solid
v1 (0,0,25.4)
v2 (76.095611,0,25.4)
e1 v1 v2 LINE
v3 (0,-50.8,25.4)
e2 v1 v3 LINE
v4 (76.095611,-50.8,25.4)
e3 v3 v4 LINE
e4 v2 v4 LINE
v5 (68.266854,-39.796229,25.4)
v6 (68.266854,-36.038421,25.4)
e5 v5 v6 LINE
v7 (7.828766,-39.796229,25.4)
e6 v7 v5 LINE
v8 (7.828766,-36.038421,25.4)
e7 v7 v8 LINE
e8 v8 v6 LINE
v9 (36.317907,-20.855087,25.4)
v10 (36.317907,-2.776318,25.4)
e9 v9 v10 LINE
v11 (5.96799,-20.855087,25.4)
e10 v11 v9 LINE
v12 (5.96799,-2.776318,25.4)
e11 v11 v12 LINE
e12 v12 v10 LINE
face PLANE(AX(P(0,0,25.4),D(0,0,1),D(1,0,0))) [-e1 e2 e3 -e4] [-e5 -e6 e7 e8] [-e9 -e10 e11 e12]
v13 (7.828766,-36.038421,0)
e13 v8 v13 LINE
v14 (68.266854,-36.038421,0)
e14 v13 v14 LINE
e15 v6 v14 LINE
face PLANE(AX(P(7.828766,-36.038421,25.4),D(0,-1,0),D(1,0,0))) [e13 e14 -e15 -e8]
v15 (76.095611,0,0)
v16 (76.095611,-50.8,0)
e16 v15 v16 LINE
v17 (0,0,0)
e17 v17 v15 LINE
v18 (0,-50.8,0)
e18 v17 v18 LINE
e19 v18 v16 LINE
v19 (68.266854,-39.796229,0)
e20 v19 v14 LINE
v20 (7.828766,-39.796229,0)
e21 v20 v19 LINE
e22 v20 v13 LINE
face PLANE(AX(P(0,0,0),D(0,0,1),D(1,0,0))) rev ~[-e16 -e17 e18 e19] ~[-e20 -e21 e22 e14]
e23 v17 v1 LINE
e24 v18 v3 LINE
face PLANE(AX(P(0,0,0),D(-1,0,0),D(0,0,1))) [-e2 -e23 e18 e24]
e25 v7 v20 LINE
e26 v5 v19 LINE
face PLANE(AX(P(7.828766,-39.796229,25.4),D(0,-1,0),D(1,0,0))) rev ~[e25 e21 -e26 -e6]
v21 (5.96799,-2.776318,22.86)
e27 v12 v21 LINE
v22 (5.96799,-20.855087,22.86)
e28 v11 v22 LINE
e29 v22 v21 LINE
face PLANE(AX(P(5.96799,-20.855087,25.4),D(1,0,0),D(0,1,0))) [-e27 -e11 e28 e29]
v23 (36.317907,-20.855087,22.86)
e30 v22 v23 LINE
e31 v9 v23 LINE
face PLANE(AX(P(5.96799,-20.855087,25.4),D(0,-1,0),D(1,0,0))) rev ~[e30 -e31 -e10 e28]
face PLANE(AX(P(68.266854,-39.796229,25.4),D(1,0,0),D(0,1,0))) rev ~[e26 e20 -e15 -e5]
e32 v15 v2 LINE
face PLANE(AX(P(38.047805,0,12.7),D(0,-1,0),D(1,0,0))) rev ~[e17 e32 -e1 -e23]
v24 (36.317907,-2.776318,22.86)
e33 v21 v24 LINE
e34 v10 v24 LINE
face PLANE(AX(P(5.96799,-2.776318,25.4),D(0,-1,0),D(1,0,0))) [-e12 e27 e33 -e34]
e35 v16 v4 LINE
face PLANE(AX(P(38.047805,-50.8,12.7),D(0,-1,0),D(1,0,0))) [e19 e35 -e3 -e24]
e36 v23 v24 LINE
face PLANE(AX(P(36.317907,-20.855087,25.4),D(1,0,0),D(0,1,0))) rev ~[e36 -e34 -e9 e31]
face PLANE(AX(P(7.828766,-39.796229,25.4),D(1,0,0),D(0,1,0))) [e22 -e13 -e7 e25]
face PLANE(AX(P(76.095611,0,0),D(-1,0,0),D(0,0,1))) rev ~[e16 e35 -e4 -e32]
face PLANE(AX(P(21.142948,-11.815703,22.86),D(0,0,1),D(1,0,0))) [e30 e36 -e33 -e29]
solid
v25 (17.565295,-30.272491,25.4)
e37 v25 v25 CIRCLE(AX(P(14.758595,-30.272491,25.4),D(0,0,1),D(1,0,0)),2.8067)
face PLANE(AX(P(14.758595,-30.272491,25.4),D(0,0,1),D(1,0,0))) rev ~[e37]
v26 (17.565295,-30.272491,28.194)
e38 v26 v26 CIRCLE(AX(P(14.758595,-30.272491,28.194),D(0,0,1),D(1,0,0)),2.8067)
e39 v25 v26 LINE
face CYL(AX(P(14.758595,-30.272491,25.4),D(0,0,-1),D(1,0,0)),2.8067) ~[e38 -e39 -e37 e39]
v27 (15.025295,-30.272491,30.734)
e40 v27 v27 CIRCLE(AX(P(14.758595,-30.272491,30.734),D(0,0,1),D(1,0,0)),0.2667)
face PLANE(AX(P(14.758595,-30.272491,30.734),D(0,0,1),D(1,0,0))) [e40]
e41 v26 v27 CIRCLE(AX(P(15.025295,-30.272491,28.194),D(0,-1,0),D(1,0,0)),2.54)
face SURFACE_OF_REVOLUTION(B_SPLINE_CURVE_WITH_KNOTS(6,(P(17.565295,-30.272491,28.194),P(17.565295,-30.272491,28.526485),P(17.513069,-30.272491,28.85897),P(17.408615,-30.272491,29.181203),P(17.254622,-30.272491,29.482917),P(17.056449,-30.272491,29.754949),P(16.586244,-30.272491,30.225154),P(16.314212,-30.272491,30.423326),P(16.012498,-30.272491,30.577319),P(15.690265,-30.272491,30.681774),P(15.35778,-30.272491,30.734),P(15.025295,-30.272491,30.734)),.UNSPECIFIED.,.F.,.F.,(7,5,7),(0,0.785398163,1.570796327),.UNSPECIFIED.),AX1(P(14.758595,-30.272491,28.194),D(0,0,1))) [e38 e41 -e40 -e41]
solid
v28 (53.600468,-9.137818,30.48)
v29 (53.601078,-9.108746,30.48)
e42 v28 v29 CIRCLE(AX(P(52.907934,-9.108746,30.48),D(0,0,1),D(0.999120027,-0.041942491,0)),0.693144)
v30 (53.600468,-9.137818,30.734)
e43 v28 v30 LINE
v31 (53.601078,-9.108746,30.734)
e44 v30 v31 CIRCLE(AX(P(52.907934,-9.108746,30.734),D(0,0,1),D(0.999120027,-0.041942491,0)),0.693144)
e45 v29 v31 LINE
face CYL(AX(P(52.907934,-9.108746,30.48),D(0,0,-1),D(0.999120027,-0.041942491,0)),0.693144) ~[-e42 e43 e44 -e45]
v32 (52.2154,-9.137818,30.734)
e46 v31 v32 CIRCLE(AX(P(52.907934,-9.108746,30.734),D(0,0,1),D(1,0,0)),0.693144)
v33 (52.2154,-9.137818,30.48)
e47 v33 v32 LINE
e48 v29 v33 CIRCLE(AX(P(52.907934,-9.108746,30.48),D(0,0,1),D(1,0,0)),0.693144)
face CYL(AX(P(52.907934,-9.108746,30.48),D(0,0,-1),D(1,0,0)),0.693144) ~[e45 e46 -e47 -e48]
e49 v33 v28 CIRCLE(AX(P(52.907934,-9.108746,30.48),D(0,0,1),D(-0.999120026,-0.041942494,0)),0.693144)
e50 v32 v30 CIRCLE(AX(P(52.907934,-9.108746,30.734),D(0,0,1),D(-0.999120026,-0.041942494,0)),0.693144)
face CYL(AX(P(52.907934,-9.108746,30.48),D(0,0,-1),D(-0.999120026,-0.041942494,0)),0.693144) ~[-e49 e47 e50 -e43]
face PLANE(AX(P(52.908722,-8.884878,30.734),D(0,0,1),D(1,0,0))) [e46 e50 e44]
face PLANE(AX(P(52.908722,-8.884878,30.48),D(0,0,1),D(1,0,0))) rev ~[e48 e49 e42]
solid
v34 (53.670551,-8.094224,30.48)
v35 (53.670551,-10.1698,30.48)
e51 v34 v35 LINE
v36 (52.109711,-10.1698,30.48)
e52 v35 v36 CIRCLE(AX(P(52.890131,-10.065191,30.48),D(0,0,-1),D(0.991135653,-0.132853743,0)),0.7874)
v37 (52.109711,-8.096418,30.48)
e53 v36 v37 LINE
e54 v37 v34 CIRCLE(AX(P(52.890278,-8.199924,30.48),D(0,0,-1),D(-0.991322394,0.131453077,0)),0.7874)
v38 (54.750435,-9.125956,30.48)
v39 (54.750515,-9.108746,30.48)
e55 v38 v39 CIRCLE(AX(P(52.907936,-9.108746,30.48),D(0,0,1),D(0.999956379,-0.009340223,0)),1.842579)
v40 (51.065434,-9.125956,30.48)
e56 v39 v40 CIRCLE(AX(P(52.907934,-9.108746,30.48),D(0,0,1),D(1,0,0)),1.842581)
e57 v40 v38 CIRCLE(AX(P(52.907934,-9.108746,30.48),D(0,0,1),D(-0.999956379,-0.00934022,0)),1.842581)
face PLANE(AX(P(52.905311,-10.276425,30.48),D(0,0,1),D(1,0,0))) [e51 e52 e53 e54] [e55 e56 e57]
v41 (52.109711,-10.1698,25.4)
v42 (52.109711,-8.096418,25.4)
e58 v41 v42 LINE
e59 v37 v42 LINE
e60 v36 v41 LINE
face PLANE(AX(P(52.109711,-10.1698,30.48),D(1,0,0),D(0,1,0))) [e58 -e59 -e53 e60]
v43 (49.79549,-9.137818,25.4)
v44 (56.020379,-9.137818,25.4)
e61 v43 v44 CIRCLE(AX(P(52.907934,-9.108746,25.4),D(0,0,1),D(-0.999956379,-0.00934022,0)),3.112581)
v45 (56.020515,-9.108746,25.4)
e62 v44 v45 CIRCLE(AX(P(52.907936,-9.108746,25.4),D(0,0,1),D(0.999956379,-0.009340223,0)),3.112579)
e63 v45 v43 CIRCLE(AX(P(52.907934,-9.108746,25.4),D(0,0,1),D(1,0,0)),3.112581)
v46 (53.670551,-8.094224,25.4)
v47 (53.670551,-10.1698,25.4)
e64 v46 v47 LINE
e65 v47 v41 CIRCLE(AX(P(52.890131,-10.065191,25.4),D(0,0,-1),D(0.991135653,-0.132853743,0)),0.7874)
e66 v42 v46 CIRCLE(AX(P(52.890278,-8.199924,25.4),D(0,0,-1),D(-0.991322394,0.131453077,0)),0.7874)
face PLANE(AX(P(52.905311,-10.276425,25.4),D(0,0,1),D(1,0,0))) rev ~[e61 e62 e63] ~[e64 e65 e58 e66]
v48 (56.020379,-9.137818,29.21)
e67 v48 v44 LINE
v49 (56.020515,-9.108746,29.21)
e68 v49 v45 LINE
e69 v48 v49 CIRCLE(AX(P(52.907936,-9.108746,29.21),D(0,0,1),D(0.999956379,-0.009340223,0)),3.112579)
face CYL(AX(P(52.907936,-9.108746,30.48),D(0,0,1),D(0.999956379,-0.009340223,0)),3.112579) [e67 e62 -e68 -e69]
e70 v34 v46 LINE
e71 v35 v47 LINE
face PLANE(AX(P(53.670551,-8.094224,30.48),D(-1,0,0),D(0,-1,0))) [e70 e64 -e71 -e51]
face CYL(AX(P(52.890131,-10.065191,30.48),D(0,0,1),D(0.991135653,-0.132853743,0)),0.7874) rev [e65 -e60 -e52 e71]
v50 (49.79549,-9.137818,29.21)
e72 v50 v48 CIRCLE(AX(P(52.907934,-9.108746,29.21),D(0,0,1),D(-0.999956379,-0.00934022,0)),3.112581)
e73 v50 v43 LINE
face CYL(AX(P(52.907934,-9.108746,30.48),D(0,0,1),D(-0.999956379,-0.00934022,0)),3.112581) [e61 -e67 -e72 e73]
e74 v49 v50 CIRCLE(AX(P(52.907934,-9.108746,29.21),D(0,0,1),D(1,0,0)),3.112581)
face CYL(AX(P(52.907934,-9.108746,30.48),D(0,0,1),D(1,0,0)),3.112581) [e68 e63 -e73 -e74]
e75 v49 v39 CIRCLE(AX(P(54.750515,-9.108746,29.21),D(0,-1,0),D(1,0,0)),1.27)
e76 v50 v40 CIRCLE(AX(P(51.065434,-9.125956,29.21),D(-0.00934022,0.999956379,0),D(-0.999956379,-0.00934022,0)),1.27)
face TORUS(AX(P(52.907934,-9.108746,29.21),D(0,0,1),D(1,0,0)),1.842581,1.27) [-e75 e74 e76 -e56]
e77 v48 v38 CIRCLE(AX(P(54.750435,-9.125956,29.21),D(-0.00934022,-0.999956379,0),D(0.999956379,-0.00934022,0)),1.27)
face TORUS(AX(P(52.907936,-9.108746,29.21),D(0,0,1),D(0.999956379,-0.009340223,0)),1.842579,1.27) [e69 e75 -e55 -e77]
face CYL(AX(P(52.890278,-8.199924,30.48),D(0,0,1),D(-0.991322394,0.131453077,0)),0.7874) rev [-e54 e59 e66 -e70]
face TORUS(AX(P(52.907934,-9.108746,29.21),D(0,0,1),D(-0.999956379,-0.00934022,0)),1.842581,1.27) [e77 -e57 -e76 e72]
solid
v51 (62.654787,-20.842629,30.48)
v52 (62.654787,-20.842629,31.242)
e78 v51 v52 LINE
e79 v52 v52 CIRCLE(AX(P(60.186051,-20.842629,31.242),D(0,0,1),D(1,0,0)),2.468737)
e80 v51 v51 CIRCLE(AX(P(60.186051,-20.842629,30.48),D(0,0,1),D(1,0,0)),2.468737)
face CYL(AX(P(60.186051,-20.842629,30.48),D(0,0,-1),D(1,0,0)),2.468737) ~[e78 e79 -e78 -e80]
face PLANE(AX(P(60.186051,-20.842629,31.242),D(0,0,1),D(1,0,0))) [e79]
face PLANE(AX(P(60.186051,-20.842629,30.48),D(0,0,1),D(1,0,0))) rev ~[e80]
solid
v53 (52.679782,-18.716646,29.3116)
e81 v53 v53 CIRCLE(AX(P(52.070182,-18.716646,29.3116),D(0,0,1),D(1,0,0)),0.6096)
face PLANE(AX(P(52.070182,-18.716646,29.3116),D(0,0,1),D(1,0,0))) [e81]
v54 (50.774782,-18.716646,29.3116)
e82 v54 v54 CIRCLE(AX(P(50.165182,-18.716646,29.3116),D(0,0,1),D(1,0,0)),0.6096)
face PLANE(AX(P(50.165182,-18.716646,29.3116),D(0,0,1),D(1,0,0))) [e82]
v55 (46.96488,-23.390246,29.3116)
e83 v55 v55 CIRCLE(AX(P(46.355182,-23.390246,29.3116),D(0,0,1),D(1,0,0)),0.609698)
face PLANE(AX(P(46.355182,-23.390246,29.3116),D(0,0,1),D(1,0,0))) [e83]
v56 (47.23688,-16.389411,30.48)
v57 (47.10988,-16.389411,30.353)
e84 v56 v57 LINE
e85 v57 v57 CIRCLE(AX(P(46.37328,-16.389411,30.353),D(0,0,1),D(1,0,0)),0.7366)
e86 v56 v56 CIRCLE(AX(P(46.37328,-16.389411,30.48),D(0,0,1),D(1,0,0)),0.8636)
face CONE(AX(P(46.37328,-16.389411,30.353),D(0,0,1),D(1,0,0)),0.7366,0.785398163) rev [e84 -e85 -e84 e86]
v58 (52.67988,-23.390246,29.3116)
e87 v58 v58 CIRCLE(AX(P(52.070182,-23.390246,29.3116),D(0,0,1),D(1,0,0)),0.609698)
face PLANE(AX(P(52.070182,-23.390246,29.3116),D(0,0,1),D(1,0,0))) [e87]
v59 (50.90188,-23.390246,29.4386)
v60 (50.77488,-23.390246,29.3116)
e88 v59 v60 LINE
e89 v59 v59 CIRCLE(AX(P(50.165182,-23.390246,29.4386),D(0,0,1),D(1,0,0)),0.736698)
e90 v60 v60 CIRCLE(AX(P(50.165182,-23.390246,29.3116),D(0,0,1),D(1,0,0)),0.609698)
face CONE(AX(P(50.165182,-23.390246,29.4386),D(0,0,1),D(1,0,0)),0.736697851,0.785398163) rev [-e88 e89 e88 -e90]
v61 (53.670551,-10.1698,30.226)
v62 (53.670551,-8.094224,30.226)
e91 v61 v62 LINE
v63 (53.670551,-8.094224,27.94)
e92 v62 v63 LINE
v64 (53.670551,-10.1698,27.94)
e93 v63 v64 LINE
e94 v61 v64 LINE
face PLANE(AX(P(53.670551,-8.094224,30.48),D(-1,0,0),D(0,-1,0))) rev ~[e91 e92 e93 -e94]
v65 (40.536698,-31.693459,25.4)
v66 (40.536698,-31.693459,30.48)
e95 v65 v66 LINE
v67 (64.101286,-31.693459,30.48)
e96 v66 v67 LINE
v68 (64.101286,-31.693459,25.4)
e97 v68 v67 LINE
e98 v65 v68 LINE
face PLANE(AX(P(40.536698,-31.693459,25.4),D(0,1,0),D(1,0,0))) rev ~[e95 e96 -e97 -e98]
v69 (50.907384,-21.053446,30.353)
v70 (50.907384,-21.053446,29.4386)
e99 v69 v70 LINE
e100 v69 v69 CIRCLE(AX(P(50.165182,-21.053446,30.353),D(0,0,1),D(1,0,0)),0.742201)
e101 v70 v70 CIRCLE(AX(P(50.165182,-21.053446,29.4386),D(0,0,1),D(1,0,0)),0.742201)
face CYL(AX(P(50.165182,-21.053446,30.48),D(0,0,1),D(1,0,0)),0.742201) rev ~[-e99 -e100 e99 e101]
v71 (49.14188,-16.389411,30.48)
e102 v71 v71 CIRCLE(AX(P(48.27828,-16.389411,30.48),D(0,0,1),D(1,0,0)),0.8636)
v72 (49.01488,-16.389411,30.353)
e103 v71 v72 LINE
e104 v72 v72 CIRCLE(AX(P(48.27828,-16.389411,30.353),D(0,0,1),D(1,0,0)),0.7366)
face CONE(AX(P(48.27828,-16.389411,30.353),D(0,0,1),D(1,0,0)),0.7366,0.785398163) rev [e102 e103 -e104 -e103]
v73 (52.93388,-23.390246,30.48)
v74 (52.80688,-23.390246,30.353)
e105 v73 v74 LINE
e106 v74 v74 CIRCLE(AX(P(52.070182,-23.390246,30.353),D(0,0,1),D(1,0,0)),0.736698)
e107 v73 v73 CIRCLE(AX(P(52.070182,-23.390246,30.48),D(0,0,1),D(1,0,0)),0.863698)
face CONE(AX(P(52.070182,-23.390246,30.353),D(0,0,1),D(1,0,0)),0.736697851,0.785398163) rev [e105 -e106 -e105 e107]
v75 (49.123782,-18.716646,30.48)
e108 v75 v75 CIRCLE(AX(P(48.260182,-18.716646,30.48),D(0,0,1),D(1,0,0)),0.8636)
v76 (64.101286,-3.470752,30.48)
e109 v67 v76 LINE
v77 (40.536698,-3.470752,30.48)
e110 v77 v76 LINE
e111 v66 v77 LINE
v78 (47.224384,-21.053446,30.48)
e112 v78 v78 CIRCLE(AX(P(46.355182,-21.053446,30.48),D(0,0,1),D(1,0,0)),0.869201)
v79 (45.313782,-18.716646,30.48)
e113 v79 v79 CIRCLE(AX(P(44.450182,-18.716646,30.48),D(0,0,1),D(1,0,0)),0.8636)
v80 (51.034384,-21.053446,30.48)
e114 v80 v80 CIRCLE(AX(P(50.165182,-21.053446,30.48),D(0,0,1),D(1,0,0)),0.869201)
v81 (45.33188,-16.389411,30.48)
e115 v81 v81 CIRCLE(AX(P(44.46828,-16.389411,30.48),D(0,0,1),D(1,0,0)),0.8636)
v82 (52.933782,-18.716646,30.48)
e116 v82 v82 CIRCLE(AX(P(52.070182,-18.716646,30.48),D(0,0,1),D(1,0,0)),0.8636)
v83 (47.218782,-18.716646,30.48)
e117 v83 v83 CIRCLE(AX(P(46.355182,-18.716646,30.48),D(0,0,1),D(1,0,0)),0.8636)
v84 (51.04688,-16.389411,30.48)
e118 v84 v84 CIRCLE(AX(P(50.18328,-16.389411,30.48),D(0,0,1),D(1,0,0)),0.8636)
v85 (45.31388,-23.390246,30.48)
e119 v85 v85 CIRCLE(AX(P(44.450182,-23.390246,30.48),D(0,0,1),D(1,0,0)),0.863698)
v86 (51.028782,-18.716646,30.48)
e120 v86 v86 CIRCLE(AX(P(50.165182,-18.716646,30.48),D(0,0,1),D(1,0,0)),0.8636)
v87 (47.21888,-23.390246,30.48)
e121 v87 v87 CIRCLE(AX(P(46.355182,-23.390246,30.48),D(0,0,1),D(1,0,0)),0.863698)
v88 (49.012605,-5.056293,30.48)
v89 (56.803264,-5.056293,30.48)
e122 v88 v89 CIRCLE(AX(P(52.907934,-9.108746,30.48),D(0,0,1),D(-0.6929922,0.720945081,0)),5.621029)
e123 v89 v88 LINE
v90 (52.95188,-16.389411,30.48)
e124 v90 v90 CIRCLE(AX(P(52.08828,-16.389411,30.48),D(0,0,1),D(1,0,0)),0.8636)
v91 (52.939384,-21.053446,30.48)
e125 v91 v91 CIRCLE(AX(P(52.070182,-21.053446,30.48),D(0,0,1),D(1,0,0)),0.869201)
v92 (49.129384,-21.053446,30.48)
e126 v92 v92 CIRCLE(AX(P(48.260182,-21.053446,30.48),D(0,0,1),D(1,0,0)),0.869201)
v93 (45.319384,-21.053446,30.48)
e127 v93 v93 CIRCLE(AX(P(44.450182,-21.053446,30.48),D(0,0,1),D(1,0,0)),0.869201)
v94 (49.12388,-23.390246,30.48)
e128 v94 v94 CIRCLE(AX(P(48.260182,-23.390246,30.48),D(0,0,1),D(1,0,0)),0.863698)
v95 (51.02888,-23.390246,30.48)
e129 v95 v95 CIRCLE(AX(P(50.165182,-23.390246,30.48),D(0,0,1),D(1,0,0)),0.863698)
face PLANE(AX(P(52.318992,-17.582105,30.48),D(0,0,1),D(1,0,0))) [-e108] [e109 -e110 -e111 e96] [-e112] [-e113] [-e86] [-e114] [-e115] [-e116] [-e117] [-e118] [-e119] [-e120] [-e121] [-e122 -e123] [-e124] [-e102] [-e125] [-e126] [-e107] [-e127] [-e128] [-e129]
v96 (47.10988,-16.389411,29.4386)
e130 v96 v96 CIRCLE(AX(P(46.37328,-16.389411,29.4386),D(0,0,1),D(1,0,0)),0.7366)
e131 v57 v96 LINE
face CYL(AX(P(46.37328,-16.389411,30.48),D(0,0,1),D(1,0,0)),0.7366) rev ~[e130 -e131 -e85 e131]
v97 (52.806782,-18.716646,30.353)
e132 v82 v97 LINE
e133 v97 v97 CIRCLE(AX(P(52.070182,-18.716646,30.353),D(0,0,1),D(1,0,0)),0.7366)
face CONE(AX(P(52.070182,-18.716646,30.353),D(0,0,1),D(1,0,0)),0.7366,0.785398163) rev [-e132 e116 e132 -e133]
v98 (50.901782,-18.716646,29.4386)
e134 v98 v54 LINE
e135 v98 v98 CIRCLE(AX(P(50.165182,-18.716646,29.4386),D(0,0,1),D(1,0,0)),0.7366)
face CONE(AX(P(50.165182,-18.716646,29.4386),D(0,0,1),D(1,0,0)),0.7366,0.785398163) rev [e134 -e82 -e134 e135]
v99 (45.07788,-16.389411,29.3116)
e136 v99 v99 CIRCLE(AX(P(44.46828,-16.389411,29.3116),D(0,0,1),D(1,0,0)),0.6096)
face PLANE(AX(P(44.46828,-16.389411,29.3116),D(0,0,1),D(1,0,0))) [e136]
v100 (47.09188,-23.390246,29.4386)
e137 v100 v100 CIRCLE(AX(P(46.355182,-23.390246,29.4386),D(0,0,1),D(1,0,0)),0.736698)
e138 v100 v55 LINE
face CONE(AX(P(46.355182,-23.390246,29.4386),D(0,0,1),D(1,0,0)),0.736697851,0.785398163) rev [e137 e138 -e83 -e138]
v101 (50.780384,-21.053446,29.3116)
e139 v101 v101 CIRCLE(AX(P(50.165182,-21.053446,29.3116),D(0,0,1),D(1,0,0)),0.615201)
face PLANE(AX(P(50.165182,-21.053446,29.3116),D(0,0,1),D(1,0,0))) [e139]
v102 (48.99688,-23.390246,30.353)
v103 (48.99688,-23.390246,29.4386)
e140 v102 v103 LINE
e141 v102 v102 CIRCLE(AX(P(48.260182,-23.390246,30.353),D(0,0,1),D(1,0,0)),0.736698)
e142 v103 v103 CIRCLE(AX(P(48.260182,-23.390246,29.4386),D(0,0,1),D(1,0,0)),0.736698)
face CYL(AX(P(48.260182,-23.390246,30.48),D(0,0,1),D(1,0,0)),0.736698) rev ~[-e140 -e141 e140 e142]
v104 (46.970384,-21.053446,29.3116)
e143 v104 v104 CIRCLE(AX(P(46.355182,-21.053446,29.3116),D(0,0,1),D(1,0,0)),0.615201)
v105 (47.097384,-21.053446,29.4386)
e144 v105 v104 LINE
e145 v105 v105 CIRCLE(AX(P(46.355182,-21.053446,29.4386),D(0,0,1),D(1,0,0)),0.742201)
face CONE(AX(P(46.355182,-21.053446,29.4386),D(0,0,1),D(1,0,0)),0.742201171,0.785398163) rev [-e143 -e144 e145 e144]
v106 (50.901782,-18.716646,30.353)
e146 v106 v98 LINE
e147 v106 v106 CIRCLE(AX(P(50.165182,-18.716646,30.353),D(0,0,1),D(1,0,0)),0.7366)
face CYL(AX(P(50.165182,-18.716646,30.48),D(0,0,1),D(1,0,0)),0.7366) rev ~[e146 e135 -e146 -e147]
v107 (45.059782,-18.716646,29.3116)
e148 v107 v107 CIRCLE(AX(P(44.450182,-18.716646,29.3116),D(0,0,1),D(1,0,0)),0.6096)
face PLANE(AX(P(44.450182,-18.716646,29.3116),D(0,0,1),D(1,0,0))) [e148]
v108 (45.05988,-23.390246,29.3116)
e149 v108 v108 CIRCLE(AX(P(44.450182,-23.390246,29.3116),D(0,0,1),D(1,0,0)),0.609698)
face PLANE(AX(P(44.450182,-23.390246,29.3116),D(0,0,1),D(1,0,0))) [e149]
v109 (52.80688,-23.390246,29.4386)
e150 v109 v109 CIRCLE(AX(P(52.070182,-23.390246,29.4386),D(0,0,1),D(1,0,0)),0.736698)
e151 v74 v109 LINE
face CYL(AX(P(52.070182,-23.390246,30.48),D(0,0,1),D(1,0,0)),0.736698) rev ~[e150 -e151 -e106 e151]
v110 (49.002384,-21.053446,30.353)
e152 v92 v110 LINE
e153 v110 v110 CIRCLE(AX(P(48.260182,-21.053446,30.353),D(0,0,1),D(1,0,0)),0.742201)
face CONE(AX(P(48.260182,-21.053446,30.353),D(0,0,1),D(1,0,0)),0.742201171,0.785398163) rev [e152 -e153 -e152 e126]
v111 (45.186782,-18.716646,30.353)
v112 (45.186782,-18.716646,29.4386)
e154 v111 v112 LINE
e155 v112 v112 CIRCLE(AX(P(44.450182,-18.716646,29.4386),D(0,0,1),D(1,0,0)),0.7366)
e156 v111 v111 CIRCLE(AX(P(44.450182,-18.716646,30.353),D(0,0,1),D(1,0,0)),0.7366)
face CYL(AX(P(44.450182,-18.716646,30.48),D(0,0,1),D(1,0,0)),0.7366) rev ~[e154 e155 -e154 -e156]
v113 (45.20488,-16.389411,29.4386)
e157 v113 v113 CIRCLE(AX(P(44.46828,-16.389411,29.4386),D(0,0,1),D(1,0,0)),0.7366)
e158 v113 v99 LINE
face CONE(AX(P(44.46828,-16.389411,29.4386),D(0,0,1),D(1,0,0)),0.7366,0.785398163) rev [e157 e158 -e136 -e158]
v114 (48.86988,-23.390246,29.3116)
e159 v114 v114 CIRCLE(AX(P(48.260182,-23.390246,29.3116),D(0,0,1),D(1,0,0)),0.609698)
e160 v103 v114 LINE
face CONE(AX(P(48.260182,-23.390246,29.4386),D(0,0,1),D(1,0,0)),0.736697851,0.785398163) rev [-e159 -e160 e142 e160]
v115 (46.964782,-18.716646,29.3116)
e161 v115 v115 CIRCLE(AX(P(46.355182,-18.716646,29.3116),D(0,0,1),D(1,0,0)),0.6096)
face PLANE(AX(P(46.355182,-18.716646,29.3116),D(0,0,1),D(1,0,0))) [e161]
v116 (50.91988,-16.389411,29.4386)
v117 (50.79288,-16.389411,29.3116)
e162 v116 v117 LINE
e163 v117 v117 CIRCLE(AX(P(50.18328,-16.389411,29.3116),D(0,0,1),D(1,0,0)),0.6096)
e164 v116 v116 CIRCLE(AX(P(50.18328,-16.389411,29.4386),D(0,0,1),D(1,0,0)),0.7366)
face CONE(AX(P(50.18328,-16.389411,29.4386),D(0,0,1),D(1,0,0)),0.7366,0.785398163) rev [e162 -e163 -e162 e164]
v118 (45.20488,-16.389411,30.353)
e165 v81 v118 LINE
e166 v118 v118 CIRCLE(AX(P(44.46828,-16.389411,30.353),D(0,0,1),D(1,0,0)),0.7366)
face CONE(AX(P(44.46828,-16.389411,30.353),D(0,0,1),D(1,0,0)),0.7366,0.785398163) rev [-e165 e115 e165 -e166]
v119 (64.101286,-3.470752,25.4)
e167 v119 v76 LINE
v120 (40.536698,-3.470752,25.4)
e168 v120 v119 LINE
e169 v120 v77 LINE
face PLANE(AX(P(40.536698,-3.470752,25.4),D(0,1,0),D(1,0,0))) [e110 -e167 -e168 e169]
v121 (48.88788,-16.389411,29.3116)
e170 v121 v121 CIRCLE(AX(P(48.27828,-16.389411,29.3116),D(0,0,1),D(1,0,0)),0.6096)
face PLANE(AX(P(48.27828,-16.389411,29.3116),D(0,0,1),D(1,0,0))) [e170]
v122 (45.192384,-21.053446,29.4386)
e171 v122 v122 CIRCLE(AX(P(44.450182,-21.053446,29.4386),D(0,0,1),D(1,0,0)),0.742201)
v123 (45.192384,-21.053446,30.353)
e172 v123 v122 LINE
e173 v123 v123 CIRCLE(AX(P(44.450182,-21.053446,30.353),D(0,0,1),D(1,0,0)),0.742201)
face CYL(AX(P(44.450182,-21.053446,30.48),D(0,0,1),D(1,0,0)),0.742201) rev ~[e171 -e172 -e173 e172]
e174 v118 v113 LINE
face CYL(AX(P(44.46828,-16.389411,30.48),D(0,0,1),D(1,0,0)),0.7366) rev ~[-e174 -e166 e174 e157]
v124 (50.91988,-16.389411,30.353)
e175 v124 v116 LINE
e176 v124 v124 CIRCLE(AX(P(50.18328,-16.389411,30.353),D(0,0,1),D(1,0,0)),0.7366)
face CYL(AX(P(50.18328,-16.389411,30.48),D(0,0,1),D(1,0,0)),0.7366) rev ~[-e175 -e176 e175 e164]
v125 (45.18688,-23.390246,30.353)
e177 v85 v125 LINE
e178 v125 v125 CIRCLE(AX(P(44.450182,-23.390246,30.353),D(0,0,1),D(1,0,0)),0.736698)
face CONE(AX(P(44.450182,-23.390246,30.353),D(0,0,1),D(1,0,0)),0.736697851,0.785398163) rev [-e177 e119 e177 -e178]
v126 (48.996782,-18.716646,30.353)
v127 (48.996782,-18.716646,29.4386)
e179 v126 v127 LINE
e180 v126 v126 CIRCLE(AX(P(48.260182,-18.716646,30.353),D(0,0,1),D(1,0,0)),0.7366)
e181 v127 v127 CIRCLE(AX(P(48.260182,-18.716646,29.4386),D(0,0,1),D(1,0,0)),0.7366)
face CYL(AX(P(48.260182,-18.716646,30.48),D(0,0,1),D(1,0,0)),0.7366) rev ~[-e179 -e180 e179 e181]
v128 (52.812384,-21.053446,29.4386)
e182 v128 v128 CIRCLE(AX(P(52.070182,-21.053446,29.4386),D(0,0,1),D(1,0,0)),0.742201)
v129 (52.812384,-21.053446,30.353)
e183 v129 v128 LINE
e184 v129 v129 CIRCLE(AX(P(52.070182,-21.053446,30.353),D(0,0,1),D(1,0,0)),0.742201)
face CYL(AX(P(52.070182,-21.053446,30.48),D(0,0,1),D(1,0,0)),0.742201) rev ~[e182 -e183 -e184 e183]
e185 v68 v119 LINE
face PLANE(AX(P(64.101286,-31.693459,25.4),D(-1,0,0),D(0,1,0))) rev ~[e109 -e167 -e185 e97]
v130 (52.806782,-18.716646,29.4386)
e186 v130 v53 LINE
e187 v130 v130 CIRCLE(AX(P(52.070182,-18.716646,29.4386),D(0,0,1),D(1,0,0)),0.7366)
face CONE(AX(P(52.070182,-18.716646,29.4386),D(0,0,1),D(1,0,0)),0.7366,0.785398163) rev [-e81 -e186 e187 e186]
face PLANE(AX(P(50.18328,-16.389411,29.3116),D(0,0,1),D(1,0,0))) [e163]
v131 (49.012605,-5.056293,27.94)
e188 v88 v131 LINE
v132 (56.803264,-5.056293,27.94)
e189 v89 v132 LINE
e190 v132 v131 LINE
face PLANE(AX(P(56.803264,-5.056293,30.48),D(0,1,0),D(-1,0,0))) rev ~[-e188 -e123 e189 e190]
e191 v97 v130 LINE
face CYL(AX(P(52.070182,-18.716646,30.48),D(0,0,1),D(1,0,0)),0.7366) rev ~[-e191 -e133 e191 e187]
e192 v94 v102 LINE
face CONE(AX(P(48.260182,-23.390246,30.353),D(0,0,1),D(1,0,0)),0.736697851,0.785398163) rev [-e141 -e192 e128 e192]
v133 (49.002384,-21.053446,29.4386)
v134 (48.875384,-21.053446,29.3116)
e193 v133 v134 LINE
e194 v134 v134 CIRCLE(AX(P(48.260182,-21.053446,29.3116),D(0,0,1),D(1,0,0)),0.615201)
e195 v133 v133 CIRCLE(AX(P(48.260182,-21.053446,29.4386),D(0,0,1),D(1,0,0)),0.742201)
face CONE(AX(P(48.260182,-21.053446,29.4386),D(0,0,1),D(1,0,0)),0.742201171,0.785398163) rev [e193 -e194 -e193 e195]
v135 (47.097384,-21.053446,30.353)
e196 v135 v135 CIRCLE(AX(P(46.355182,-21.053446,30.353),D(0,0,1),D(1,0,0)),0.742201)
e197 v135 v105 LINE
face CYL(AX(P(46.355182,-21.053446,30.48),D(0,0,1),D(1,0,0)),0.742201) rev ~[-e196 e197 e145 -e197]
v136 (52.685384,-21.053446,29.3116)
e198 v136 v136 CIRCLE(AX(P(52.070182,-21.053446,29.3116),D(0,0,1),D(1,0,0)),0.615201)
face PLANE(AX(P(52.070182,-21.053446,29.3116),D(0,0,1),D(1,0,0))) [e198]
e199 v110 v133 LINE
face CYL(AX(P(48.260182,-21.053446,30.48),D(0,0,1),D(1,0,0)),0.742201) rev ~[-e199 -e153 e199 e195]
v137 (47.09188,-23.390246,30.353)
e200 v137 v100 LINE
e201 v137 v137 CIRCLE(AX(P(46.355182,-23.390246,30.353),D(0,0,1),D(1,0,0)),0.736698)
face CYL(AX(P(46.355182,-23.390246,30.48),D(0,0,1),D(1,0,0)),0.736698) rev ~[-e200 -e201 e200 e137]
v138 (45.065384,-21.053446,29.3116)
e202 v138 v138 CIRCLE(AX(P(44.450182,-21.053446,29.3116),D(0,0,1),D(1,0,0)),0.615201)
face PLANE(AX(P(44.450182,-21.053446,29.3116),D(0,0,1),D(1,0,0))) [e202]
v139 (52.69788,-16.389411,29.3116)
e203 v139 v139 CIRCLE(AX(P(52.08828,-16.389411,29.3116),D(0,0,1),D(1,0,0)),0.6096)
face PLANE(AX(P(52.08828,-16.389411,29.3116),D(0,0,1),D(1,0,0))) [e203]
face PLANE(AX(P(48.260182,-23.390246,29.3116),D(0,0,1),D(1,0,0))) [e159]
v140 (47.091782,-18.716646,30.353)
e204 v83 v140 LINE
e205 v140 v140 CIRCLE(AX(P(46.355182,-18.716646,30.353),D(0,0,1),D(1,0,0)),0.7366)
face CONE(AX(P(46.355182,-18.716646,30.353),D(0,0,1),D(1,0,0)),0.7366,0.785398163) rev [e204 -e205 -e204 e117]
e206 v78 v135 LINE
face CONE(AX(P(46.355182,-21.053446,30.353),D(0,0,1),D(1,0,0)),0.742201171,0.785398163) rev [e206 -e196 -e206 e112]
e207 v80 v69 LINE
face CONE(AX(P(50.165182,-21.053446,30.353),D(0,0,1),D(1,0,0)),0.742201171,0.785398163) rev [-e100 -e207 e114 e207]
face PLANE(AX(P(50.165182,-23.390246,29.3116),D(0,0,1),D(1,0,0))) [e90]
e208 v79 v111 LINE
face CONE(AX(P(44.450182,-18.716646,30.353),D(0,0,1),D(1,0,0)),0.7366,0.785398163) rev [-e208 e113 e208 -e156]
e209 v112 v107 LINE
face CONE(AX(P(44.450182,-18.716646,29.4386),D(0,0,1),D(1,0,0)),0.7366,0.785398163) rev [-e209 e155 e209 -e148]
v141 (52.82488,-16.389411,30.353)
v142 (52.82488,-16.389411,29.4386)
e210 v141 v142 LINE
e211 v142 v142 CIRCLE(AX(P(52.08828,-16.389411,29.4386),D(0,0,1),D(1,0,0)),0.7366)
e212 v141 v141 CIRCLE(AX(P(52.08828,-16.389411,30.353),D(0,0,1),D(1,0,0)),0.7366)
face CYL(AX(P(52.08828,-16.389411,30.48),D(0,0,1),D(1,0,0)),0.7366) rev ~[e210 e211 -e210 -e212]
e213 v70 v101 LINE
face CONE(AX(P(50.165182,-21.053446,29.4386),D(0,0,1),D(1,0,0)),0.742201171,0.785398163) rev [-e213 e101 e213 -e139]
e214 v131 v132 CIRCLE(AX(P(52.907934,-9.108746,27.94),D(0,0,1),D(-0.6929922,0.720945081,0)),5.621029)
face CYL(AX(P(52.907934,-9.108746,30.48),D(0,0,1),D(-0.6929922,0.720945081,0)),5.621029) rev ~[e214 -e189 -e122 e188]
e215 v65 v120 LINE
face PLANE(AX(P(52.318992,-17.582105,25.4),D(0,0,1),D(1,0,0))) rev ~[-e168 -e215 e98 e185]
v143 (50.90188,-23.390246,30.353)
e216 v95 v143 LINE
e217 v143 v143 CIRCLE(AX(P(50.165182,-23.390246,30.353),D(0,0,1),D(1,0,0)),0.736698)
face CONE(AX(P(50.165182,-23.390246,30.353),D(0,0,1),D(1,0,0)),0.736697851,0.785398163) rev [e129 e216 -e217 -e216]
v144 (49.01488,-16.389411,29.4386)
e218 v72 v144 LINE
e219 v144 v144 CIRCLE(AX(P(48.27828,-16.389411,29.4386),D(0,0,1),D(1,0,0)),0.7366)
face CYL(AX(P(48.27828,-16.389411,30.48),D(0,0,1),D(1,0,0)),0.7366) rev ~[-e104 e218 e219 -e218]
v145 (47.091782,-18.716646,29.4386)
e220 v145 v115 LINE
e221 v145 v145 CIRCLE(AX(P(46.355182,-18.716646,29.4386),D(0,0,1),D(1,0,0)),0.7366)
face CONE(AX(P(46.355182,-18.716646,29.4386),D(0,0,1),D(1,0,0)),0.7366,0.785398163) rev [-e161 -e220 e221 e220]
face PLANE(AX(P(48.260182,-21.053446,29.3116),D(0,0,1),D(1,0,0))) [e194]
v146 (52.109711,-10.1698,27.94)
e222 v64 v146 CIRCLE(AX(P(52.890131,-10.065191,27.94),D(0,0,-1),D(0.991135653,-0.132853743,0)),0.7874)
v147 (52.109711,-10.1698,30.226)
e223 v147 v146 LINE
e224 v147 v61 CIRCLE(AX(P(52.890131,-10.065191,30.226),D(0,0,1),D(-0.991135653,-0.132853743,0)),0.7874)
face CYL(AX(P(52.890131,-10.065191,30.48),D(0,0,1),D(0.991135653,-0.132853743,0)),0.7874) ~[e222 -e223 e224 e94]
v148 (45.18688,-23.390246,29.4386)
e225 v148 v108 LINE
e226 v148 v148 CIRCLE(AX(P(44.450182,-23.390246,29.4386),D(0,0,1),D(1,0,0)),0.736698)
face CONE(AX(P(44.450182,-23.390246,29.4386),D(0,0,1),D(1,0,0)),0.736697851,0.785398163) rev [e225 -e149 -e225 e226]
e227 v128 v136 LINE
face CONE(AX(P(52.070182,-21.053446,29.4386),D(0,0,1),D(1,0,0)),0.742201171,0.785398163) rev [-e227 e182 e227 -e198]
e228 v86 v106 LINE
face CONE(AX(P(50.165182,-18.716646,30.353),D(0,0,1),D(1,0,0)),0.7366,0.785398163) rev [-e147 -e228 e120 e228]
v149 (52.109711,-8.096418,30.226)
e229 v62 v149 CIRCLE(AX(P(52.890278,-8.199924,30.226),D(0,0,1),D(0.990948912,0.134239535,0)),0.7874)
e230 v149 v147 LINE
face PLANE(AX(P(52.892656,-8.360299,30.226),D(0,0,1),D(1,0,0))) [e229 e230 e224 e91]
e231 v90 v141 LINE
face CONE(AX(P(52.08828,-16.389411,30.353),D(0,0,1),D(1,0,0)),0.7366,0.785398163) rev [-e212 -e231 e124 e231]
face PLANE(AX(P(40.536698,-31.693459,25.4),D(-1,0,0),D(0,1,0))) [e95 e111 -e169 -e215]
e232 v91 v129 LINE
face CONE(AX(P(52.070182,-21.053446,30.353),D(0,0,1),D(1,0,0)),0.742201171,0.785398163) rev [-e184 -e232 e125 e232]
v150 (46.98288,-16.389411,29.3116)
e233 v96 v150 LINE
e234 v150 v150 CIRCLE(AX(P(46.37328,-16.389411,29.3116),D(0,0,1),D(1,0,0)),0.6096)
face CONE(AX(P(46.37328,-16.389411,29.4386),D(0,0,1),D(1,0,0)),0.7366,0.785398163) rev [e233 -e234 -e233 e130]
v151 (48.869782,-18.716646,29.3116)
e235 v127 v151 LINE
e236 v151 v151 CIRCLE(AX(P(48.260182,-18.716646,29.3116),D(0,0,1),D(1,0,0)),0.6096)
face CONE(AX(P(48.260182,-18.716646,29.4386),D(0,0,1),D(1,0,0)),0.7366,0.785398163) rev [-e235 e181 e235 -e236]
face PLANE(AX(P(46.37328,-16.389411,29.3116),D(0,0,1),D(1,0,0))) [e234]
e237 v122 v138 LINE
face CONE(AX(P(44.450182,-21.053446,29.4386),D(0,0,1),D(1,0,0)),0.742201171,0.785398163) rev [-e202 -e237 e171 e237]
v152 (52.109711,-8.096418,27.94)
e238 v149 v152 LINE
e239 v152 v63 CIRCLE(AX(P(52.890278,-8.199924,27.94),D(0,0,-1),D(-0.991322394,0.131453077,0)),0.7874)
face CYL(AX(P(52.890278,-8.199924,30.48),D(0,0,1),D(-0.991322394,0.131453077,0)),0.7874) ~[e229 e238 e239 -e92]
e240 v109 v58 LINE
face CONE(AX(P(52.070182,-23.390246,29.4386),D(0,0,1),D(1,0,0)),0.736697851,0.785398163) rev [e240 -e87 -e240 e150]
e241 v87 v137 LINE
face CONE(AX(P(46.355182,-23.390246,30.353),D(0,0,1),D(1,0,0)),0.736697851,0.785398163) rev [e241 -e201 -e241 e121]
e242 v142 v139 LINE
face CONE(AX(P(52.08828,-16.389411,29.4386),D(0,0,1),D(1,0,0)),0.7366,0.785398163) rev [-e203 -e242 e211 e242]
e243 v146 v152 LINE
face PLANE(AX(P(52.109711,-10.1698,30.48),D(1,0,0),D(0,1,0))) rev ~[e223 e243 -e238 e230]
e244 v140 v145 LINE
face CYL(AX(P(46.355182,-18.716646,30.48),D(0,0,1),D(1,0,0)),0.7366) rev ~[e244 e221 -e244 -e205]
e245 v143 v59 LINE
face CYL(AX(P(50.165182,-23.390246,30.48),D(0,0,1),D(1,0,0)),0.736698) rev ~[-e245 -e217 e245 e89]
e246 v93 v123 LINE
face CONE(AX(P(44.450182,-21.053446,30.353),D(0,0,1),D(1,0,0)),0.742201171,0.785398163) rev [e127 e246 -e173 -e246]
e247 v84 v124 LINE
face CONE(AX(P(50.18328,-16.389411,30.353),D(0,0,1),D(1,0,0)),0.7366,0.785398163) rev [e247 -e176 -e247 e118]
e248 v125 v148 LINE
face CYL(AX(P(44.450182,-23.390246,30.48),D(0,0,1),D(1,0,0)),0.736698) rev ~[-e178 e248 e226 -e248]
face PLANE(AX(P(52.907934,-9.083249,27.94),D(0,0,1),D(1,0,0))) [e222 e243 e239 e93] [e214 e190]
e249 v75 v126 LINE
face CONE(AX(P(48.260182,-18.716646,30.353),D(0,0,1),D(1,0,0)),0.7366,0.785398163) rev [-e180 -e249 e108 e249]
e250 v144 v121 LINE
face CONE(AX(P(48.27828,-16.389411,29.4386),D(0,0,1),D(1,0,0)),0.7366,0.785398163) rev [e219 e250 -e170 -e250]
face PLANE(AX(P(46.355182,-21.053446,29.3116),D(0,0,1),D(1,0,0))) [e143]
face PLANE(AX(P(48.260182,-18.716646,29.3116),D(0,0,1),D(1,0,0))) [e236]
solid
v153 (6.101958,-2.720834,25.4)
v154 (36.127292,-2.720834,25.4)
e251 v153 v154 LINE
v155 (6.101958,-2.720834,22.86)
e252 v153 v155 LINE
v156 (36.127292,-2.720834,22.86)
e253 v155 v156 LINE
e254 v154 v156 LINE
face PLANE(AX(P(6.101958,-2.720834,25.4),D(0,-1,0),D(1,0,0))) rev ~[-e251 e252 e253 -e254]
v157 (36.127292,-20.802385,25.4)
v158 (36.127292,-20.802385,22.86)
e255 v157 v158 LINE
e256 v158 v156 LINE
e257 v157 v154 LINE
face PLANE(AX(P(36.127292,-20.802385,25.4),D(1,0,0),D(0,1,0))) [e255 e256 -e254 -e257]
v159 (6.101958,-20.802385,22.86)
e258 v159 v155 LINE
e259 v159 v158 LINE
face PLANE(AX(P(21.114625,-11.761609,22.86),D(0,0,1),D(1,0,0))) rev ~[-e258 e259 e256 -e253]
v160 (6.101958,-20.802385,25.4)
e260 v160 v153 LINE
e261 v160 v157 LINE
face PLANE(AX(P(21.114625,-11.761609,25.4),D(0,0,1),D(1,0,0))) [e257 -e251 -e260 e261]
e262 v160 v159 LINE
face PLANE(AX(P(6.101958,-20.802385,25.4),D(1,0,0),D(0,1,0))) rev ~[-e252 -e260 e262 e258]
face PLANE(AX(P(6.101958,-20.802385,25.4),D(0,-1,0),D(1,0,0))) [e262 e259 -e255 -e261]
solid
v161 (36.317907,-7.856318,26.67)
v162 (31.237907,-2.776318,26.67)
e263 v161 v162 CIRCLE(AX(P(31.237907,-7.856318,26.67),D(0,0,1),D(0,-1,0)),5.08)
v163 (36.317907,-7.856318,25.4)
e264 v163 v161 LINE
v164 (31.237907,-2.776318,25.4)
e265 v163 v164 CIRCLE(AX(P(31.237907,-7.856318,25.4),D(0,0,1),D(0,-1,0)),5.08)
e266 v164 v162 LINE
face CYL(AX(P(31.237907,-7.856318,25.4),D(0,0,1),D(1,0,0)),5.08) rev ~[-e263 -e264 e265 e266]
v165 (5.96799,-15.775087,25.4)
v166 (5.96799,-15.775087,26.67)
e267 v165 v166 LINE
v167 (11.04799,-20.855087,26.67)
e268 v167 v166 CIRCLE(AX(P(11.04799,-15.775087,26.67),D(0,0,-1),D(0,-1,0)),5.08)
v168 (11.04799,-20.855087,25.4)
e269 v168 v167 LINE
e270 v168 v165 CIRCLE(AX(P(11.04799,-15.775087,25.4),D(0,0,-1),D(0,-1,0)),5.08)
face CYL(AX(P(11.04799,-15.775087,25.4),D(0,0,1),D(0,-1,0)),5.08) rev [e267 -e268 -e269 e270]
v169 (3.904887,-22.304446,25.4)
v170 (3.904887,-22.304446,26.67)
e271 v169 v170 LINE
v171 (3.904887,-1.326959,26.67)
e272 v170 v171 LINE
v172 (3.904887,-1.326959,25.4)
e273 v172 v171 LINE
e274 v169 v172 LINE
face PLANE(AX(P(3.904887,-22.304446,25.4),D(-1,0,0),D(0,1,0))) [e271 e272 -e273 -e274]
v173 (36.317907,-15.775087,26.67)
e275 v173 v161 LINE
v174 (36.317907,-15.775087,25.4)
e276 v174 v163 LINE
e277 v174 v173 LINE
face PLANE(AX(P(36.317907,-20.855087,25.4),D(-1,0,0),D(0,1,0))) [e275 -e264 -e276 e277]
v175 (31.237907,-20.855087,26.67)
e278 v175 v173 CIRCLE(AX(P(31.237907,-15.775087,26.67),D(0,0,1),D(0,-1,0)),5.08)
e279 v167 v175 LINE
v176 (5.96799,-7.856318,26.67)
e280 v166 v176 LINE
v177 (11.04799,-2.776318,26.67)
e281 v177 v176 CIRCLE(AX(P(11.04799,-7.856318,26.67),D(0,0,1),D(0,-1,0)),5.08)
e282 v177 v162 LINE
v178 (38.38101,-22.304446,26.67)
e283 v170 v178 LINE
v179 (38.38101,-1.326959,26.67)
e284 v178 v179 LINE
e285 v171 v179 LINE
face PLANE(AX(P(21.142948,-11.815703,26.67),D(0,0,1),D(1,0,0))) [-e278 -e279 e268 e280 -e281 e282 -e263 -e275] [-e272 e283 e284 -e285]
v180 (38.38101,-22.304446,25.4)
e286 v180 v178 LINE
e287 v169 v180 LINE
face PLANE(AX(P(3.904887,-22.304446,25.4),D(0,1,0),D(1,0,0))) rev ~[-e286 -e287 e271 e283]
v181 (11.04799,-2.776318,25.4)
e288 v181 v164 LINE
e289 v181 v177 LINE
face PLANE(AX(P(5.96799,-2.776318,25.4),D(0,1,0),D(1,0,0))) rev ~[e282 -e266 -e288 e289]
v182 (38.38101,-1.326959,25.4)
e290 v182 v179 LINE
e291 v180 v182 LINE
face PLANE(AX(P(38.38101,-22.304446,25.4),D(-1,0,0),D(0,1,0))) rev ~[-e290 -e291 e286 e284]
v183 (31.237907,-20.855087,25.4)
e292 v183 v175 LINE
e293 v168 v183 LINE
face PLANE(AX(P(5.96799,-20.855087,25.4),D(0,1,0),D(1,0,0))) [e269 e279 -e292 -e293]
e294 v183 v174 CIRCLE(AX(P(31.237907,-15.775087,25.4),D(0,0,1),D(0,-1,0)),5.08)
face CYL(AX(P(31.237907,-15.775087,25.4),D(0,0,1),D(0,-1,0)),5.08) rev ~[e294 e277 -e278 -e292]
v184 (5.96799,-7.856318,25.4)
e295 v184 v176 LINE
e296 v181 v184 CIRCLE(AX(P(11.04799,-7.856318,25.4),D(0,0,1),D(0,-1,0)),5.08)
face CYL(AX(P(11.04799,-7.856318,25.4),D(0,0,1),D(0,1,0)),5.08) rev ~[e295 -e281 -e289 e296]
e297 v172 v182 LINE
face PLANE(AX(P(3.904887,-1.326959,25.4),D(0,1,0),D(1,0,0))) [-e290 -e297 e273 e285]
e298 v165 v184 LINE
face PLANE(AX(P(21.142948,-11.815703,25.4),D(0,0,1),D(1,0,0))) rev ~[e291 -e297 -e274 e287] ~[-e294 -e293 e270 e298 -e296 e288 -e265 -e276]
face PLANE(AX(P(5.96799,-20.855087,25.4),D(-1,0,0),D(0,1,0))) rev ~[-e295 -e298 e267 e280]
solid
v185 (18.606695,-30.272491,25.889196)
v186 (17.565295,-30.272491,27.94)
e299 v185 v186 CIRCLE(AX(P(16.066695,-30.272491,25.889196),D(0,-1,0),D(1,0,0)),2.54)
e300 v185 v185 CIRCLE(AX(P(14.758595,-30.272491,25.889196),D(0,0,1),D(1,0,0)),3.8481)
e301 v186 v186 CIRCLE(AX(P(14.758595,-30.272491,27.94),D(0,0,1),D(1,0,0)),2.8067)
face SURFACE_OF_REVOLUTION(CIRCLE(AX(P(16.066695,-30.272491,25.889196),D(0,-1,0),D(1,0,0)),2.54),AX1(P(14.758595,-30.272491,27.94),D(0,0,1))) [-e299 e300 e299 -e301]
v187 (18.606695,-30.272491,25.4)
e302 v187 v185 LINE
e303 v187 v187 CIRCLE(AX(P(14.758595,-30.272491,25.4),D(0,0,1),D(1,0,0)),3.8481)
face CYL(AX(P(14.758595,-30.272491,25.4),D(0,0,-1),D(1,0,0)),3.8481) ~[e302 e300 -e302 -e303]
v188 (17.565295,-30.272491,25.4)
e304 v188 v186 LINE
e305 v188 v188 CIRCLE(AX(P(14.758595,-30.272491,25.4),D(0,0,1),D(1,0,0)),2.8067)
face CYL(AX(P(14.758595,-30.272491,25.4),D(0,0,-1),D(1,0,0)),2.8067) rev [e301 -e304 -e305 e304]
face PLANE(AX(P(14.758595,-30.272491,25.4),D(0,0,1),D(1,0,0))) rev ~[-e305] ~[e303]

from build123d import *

# Parameters (mm, degrees)
F0_W      = 76.095610857
F0_H      = 25.4
F1_DEPTH  = 50.8
F2_W      = 60.4380872101
F2_H      = 3.7578083575
F3_DEPTH  = 63.5
F2_R      = 3.8481
F2_R_2    = 2.8067
F4_DEPTH  = 2.54
F5_DEPTH  = 5.334
F2_W_2    = 23.5645882785
F2_H_2    = 28.2227061689
F7_DEPTH  = 5.08
F8_R      = 0.7366
F8_R_2    = 0.7422011714
F8_R_3    = 0.7366978513
F9_DEPTH  = 1.1684
F10_SIZE  = 0.127
F8_R_4    = 2.4687366623
F11_DEPTH = 0.762
F12_DEPTH = 2.54
F13_DEPTH = 5.08
F14_R     = 1.27
F15_DEPTH = 0.254
F16_DEPTH = 0.254
F19_R     = 2.54
F18_W     = 34.4761237502
F18_H     = 20.9774870891
F18_W_2   = 30.3499177098
F18_H_2   = 18.0787695572
F20_DEPTH = 1.27
F21_R     = 5.08
F22_DEPTH = 2.54
F24_W     = 30.0253331661
F24_H     = 18.0815514177
F25_DEPTH = 2.54


# Not quite as in the source:
# - a fillet or chamfer that OpenCascade refuses, or shapes differently, is made with other operations: its cross-section is extruded or revolved along the edge and cut away or added
# - a feature names something its author has since deleted; it is built from what else it names


with BuildPart() as f1:
    # F0 (on Front) → F1 (new body)
    with BuildSketch(Plane.XZ):
        with Locations((38.0478054285, 12.7)):
            Rectangle(F0_W, F0_H)
    extrude(amount=F1_DEPTH)

    # F2 (on face) → F3 (cut)
    with BuildSketch(Plane.XY.offset(25.4)):
        with Locations((38.0478100851, -37.9173252732)):
            Rectangle(F2_W, F2_H)
    extrude(amount=-F3_DEPTH, mode=Mode.SUBTRACT)

    # F18 (on offset) → F22 (cut)
    with BuildSketch(Plane.XY.offset(25.4)):
        with Locations((21.1429484189, -11.8157025427)):
            Rectangle(F18_W_2, F18_H_2)
    extrude(amount=-F22_DEPTH, mode=Mode.SUBTRACT)


with BuildPart() as f4:
    # F2 (on face) → F4 (new body)
    with BuildSketch(Plane.XY.offset(25.4)):
        with Locations((14.7585952654, -30.2724912763)):
            Circle(F2_R)
        with Locations((14.7585952654, -30.2724912763)):
            Circle(F2_R_2, mode=Mode.SUBTRACT)
    extrude(amount=F4_DEPTH)

    # F6: fillet of radius 2.54 on 1 edges, made by hand

    # F6_s1 → F6_t2 (revolve, cut)
    with BuildSketch(Plane.XZ.offset(30.2724912763)):
        with BuildLine():
            ThreePointArc((18.6066952654, 25.8891957578), (18.331429687, 27.0392296703), (17.5652952654, 27.94))
            Line((17.5652952654, 27.94), (18.6066952654, 27.94))
            Line((18.6066952654, 27.94), (18.6066952654, 25.8891957578))
        make_face()
    revolve(axis=Axis((14.7585952654, -30.2724912763, 27.94), (0, 0, 1)), mode=Mode.SUBTRACT)


with BuildPart() as f5:
    # F2 (on face) → F5 (new body)
    with BuildSketch(Plane.XY.offset(25.4)):
        with Locations((14.7585952654, -30.2724912763)):
            Circle(F2_R_2)
    extrude(amount=F5_DEPTH)

    # F19
    f19_edges = [f5.edges().sort_by_distance(p)[0] for p in [
        (11.951895, -30.272491, 30.734),
    ]]
    fillet(f19_edges, radius=F19_R)


with BuildPart() as f7:
    # F2 (on face) → F7 (new body)
    with BuildSketch(Plane.XY.offset(25.4)):
        with Locations((52.3189920932, -17.5821054727)):
            Rectangle(F2_W_2, F2_H_2)
    extrude(amount=F7_DEPTH)

    # F8 (on face) → F9 (cut)
    with BuildSketch(Plane.XY.offset(30.48)):
        with Locations((44.468279928, -16.3894109428)):
            Circle(F8_R)
        with Locations((44.4501824677, -18.7166463584)):
            Circle(F8_R)
        with Locations((46.373279928, -16.3894109428)):
            Circle(F8_R)
        with Locations((48.278279928, -16.3894109428)):
            Circle(F8_R)
        with Locations((50.183279928, -16.3894109428)):
            Circle(F8_R)
        with Locations((52.088279928, -16.3894109428)):
            Circle(F8_R)
        with Locations((52.0701824677, -18.7166463584)):
            Circle(F8_R)
        with Locations((50.1651824677, -18.7166463584)):
            Circle(F8_R)
        with Locations((48.2601824677, -18.7166463584)):
            Circle(F8_R)
        with Locations((46.3551824677, -18.7166463584)):
            Circle(F8_R)
        with Locations((44.4501824677, -21.0534463584)):
            Circle(F8_R_2)
        with Locations((46.3551824677, -21.0534463584)):
            Circle(F8_R_2)
        with Locations((48.2601824677, -21.0534463584)):
            Circle(F8_R_2)
        with Locations((50.1651824677, -21.0534463584)):
            Circle(F8_R_2)
        with Locations((52.0701824677, -21.0534463584)):
            Circle(F8_R_2)
        with Locations((52.0701824677, -23.3902463584)):
            Circle(F8_R_3)
        with Locations((50.1651824677, -23.3902463584)):
            Circle(F8_R_3)
        with Locations((48.2601824677, -23.3902463584)):
            Circle(F8_R_3)
        with Locations((46.3551824677, -23.3902463584)):
            Circle(F8_R_3)
        with Locations((44.4501824677, -23.3902463584)):
            Circle(F8_R_3)
    extrude(amount=-F9_DEPTH, mode=Mode.SUBTRACT)

    # F10
    f10_edges = [f7.edges().sort_by_distance(p)[0] for p in [
        (43.73168, -16.389411, 30.48),
        (45.63668, -16.389411, 30.48),
        (47.54168, -16.389411, 29.3116),
        (49.44668, -16.389411, 29.3116),
        (45.63668, -16.389411, 29.3116),
        (43.73168, -16.389411, 29.3116),
        (47.54168, -16.389411, 30.48),
        (49.44668, -16.389411, 30.48),
        (51.35168, -16.389411, 29.3116),
        (51.35168, -16.389411, 30.48),
        (43.713582, -18.716646, 30.48),
        (43.713582, -18.716646, 29.3116),
        (45.618582, -18.716646, 30.48),
        (45.618582, -18.716646, 29.3116),
        (47.523582, -18.716646, 29.3116),
        (47.523582, -18.716646, 30.48),
        (49.428582, -18.716646, 29.3116),
        (49.428582, -18.716646, 30.48),
        (51.333582, -18.716646, 29.3116),
        (51.333582, -18.716646, 30.48),
        (51.327981, -21.053446, 29.3116),
        (51.327981, -21.053446, 30.48),
        (49.422981, -21.053446, 29.3116),
        (49.422981, -21.053446, 30.48),
        (47.517981, -21.053446, 29.3116),
        (47.517981, -21.053446, 30.48),
        (45.612981, -21.053446, 29.3116),
        (45.612981, -21.053446, 30.48),
        (43.707981, -21.053446, 29.3116),
        (43.707981, -21.053446, 30.48),
        (43.713485, -23.390246, 29.3116),
        (43.713485, -23.390246, 30.48),
        (45.618485, -23.390246, 29.3116),
        (45.618485, -23.390246, 30.48),
        (47.523485, -23.390246, 30.48),
        (47.523485, -23.390246, 29.3116),
        (49.428485, -23.390246, 29.3116),
        (49.428485, -23.390246, 30.48),
        (51.333485, -23.390246, 29.3116),
        (51.333485, -23.390246, 30.48),
    ]]
    chamfer(f10_edges, length=F10_SIZE)

    # F8 (on face) → F12 (cut)
    with BuildSketch(Plane.XY.offset(30.48)):
        with BuildLine():
            Line((56.8032637239, -5.0562927499), (49.0126051009, -5.0562927499))
            ThreePointArc((49.0126051009, -5.0562927499), (52.9079344124, -14.7297750973), (56.8032637239, -5.0562927499))
        make_face()
        with BuildLine():
            ThreePointArc((49.7954895275, -9.1378182046), (52.8933981599, -5.9961993022), (56.0205150705, -9.1087460168))
            ThreePointArc((56.0205150705, -9.1087460168), (56.020481127, -9.1232822692), (56.0203792972, -9.1378182046))
            ThreePointArc((56.0203792972, -9.1378182046), (52.9079344124, -12.2213266749), (49.7954895275, -9.1378182046))
        make_face(mode=Mode.SUBTRACT)
        with BuildLine():
            Line((52.1097108722, -9.1378182046), (49.7954895275, -9.1378182046))
            ThreePointArc((49.7954895275, -9.1378182046), (52.9079344124, -12.2213266749), (56.0203792972, -9.1378182046))
            Line((56.0203792972, -9.1378182046), (53.6705512988, -9.1378182046))
            Line((53.6705512988, -9.1378182046), (53.6705512988, -10.1698003709))
            ThreePointArc((53.6705512988, -10.1698003709), (52.8901310855, -10.8525913337), (52.1097108722, -10.1698003709))
            Line((52.1097108722, -10.1698003709), (52.1097108722, -9.1378182046))
        make_face()
        with BuildLine():
            ThreePointArc((56.0203792972, -9.1378182046), (56.020481127, -9.1232822692), (56.0205150705, -9.1087460168))
            ThreePointArc((56.0205150705, -9.1087460168), (52.8933981599, -5.9961993022), (49.7954895275, -9.1378182046))
            Line((49.7954895275, -9.1378182046), (52.1097108722, -9.1378182046))
            Line((52.1097108722, -9.1378182046), (52.1097108722, -8.0964182046))
            ThreePointArc((52.1097108722, -8.0964182046), (52.8891712862, -7.4125251355), (53.6705512988, -8.0942241475))
            Line((53.6705512988, -8.0942241475), (53.6705512988, -9.1378182046))
            Line((53.6705512988, -9.1378182046), (56.0203792972, -9.1378182046))
        make_face()
    extrude(amount=-F12_DEPTH, mode=Mode.SUBTRACT)

    # F8 (on face) → F15 (cut)
    with BuildSketch(Plane.XY.offset(30.48)):
        with BuildLine():
            Line((52.1097108722, -8.0964182046), (52.1097108722, -9.1378182046))
            Line((52.1097108722, -9.1378182046), (52.2154003667, -9.1378182046))
            ThreePointArc((52.2154003667, -9.1378182046), (52.8933951195, -8.4157545265), (53.6010784065, -9.1087460168))
            ThreePointArc((53.6010784065, -9.1087460168), (53.6009259026, -9.1232853096), (53.6004684581, -9.1378182046))
            Line((53.6004684581, -9.1378182046), (53.6705512988, -9.1378182046))
            Line((53.6705512988, -9.1378182046), (53.6705512988, -8.0942241475))
            ThreePointArc((53.6705512988, -8.0942241475), (52.8891712862, -7.4125251355), (52.1097108722, -8.0964182046))
        make_face()
        with BuildLine():
            Line((52.2154003667, -9.1378182046), (52.1097108722, -9.1378182046))
            Line((52.1097108722, -9.1378182046), (52.1097108722, -10.1698003709))
            ThreePointArc((52.1097108722, -10.1698003709), (52.8901310855, -10.8525913337), (53.6705512988, -10.1698003709))
            Line((53.6705512988, -10.1698003709), (53.6705512988, -9.1378182046))
            Line((53.6705512988, -9.1378182046), (53.6004684581, -9.1378182046))
            ThreePointArc((53.6004684581, -9.1378182046), (52.9079344124, -9.8018900109), (52.2154003667, -9.1378182046))
        make_face()
        with BuildLine():
            Line((53.6004684581, -9.1378182046), (52.2154003667, -9.1378182046))
            ThreePointArc((52.2154003667, -9.1378182046), (52.9079344124, -9.8018900109), (53.6004684581, -9.1378182046))
        make_face()
        with BuildLine():
            ThreePointArc((53.6010784065, -9.1087460168), (52.8933951195, -8.4157545265), (52.2154003667, -9.1378182046))
            Line((52.2154003667, -9.1378182046), (53.6004684581, -9.1378182046))
            ThreePointArc((53.6004684581, -9.1378182046), (53.6009259026, -9.1232853096), (53.6010784065, -9.1087460168))
        make_face()
    extrude(amount=-F15_DEPTH, mode=Mode.SUBTRACT)


with BuildPart() as f11:
    # F8 (on face) → F11 (new body)
    with BuildSketch(Plane.XY.offset(30.48)):
        with Locations((60.1860508323, -20.8426285535)):
            Circle(F8_R_4)
    extrude(amount=F11_DEPTH)


with BuildPart() as f13:
    # F8 (on face) → F13 (new body)
    with BuildSketch(Plane.XY.offset(30.48)):
        with BuildLine():
            Line((52.1097108722, -9.1378182046), (49.7954895275, -9.1378182046))
            ThreePointArc((49.7954895275, -9.1378182046), (52.9079344124, -12.2213266749), (56.0203792972, -9.1378182046))
            Line((56.0203792972, -9.1378182046), (53.6705512988, -9.1378182046))
            Line((53.6705512988, -9.1378182046), (53.6705512988, -10.1698003709))
            ThreePointArc((53.6705512988, -10.1698003709), (52.8901310855, -10.8525913337), (52.1097108722, -10.1698003709))
            Line((52.1097108722, -10.1698003709), (52.1097108722, -9.1378182046))
        make_face()
        with BuildLine():
            ThreePointArc((56.0203792972, -9.1378182046), (56.020481127, -9.1232822692), (56.0205150705, -9.1087460168))
            ThreePointArc((56.0205150705, -9.1087460168), (52.8933981599, -5.9961993022), (49.7954895275, -9.1378182046))
            Line((49.7954895275, -9.1378182046), (52.1097108722, -9.1378182046))
            Line((52.1097108722, -9.1378182046), (52.1097108722, -8.0964182046))
            ThreePointArc((52.1097108722, -8.0964182046), (52.8891712862, -7.4125251355), (53.6705512988, -8.0942241475))
            Line((53.6705512988, -8.0942241475), (53.6705512988, -9.1378182046))
            Line((53.6705512988, -9.1378182046), (56.0203792972, -9.1378182046))
        make_face()
    extrude(amount=-F13_DEPTH)

    # F14
    f14_edges = [f13.edges().sort_by_distance(p)[0] for p in [
        (49.79549, -9.079674, 30.48),
    ]]
    fillet(f14_edges, radius=F14_R)


with BuildPart() as f16:
    # F8 (on face) → F16 (new body)
    with BuildSketch(Plane.XY.offset(30.48)):
        with BuildLine():
            ThreePointArc((53.6010784065, -9.1087460168), (52.8933951195, -8.4157545265), (52.2154003667, -9.1378182046))
            Line((52.2154003667, -9.1378182046), (53.6004684581, -9.1378182046))
            ThreePointArc((53.6004684581, -9.1378182046), (53.6009259026, -9.1232853096), (53.6010784065, -9.1087460168))
        make_face()
        with BuildLine():
            Line((53.6004684581, -9.1378182046), (52.2154003667, -9.1378182046))
            ThreePointArc((52.2154003667, -9.1378182046), (52.9079344124, -9.8018900109), (53.6004684581, -9.1378182046))
        make_face()
    extrude(amount=F16_DEPTH)


with BuildPart() as f20:
    # F18 (on offset) → F20 (new body)
    with BuildSketch(Plane.XY.offset(25.4)):
        with Locations((21.1429484189, -11.8157025427)):
            Rectangle(F18_W, F18_H)
        with Locations((21.1429484189, -11.8157025427)):
            Rectangle(F18_W_2, F18_H_2, mode=Mode.SUBTRACT)
    extrude(amount=F20_DEPTH)

    # F21
    f21_edges = [f20.edges().sort_by_distance(p)[0] for p in [
        (36.317907, -2.776318, 26.035),
        (5.96799, -2.776318, 26.035),
        (36.317907, -20.855087, 26.035),
        (5.96799, -20.855087, 26.035),
    ]]
    fillet(f21_edges, radius=F21_R)


with BuildPart() as f25:
    # F24 (on offset) → F25 (new body)
    with BuildSketch(Plane.XY.offset(25.4)):
        with Locations((21.1146250367, -11.7616094649)):
            Rectangle(F24_W, F24_H)
    extrude(amount=-F25_DEPTH)


solid = Compound([f1.part, f4.part, f5.part, f7.part, f11.part, f13.part, f16.part, f20.part, f25.part])
